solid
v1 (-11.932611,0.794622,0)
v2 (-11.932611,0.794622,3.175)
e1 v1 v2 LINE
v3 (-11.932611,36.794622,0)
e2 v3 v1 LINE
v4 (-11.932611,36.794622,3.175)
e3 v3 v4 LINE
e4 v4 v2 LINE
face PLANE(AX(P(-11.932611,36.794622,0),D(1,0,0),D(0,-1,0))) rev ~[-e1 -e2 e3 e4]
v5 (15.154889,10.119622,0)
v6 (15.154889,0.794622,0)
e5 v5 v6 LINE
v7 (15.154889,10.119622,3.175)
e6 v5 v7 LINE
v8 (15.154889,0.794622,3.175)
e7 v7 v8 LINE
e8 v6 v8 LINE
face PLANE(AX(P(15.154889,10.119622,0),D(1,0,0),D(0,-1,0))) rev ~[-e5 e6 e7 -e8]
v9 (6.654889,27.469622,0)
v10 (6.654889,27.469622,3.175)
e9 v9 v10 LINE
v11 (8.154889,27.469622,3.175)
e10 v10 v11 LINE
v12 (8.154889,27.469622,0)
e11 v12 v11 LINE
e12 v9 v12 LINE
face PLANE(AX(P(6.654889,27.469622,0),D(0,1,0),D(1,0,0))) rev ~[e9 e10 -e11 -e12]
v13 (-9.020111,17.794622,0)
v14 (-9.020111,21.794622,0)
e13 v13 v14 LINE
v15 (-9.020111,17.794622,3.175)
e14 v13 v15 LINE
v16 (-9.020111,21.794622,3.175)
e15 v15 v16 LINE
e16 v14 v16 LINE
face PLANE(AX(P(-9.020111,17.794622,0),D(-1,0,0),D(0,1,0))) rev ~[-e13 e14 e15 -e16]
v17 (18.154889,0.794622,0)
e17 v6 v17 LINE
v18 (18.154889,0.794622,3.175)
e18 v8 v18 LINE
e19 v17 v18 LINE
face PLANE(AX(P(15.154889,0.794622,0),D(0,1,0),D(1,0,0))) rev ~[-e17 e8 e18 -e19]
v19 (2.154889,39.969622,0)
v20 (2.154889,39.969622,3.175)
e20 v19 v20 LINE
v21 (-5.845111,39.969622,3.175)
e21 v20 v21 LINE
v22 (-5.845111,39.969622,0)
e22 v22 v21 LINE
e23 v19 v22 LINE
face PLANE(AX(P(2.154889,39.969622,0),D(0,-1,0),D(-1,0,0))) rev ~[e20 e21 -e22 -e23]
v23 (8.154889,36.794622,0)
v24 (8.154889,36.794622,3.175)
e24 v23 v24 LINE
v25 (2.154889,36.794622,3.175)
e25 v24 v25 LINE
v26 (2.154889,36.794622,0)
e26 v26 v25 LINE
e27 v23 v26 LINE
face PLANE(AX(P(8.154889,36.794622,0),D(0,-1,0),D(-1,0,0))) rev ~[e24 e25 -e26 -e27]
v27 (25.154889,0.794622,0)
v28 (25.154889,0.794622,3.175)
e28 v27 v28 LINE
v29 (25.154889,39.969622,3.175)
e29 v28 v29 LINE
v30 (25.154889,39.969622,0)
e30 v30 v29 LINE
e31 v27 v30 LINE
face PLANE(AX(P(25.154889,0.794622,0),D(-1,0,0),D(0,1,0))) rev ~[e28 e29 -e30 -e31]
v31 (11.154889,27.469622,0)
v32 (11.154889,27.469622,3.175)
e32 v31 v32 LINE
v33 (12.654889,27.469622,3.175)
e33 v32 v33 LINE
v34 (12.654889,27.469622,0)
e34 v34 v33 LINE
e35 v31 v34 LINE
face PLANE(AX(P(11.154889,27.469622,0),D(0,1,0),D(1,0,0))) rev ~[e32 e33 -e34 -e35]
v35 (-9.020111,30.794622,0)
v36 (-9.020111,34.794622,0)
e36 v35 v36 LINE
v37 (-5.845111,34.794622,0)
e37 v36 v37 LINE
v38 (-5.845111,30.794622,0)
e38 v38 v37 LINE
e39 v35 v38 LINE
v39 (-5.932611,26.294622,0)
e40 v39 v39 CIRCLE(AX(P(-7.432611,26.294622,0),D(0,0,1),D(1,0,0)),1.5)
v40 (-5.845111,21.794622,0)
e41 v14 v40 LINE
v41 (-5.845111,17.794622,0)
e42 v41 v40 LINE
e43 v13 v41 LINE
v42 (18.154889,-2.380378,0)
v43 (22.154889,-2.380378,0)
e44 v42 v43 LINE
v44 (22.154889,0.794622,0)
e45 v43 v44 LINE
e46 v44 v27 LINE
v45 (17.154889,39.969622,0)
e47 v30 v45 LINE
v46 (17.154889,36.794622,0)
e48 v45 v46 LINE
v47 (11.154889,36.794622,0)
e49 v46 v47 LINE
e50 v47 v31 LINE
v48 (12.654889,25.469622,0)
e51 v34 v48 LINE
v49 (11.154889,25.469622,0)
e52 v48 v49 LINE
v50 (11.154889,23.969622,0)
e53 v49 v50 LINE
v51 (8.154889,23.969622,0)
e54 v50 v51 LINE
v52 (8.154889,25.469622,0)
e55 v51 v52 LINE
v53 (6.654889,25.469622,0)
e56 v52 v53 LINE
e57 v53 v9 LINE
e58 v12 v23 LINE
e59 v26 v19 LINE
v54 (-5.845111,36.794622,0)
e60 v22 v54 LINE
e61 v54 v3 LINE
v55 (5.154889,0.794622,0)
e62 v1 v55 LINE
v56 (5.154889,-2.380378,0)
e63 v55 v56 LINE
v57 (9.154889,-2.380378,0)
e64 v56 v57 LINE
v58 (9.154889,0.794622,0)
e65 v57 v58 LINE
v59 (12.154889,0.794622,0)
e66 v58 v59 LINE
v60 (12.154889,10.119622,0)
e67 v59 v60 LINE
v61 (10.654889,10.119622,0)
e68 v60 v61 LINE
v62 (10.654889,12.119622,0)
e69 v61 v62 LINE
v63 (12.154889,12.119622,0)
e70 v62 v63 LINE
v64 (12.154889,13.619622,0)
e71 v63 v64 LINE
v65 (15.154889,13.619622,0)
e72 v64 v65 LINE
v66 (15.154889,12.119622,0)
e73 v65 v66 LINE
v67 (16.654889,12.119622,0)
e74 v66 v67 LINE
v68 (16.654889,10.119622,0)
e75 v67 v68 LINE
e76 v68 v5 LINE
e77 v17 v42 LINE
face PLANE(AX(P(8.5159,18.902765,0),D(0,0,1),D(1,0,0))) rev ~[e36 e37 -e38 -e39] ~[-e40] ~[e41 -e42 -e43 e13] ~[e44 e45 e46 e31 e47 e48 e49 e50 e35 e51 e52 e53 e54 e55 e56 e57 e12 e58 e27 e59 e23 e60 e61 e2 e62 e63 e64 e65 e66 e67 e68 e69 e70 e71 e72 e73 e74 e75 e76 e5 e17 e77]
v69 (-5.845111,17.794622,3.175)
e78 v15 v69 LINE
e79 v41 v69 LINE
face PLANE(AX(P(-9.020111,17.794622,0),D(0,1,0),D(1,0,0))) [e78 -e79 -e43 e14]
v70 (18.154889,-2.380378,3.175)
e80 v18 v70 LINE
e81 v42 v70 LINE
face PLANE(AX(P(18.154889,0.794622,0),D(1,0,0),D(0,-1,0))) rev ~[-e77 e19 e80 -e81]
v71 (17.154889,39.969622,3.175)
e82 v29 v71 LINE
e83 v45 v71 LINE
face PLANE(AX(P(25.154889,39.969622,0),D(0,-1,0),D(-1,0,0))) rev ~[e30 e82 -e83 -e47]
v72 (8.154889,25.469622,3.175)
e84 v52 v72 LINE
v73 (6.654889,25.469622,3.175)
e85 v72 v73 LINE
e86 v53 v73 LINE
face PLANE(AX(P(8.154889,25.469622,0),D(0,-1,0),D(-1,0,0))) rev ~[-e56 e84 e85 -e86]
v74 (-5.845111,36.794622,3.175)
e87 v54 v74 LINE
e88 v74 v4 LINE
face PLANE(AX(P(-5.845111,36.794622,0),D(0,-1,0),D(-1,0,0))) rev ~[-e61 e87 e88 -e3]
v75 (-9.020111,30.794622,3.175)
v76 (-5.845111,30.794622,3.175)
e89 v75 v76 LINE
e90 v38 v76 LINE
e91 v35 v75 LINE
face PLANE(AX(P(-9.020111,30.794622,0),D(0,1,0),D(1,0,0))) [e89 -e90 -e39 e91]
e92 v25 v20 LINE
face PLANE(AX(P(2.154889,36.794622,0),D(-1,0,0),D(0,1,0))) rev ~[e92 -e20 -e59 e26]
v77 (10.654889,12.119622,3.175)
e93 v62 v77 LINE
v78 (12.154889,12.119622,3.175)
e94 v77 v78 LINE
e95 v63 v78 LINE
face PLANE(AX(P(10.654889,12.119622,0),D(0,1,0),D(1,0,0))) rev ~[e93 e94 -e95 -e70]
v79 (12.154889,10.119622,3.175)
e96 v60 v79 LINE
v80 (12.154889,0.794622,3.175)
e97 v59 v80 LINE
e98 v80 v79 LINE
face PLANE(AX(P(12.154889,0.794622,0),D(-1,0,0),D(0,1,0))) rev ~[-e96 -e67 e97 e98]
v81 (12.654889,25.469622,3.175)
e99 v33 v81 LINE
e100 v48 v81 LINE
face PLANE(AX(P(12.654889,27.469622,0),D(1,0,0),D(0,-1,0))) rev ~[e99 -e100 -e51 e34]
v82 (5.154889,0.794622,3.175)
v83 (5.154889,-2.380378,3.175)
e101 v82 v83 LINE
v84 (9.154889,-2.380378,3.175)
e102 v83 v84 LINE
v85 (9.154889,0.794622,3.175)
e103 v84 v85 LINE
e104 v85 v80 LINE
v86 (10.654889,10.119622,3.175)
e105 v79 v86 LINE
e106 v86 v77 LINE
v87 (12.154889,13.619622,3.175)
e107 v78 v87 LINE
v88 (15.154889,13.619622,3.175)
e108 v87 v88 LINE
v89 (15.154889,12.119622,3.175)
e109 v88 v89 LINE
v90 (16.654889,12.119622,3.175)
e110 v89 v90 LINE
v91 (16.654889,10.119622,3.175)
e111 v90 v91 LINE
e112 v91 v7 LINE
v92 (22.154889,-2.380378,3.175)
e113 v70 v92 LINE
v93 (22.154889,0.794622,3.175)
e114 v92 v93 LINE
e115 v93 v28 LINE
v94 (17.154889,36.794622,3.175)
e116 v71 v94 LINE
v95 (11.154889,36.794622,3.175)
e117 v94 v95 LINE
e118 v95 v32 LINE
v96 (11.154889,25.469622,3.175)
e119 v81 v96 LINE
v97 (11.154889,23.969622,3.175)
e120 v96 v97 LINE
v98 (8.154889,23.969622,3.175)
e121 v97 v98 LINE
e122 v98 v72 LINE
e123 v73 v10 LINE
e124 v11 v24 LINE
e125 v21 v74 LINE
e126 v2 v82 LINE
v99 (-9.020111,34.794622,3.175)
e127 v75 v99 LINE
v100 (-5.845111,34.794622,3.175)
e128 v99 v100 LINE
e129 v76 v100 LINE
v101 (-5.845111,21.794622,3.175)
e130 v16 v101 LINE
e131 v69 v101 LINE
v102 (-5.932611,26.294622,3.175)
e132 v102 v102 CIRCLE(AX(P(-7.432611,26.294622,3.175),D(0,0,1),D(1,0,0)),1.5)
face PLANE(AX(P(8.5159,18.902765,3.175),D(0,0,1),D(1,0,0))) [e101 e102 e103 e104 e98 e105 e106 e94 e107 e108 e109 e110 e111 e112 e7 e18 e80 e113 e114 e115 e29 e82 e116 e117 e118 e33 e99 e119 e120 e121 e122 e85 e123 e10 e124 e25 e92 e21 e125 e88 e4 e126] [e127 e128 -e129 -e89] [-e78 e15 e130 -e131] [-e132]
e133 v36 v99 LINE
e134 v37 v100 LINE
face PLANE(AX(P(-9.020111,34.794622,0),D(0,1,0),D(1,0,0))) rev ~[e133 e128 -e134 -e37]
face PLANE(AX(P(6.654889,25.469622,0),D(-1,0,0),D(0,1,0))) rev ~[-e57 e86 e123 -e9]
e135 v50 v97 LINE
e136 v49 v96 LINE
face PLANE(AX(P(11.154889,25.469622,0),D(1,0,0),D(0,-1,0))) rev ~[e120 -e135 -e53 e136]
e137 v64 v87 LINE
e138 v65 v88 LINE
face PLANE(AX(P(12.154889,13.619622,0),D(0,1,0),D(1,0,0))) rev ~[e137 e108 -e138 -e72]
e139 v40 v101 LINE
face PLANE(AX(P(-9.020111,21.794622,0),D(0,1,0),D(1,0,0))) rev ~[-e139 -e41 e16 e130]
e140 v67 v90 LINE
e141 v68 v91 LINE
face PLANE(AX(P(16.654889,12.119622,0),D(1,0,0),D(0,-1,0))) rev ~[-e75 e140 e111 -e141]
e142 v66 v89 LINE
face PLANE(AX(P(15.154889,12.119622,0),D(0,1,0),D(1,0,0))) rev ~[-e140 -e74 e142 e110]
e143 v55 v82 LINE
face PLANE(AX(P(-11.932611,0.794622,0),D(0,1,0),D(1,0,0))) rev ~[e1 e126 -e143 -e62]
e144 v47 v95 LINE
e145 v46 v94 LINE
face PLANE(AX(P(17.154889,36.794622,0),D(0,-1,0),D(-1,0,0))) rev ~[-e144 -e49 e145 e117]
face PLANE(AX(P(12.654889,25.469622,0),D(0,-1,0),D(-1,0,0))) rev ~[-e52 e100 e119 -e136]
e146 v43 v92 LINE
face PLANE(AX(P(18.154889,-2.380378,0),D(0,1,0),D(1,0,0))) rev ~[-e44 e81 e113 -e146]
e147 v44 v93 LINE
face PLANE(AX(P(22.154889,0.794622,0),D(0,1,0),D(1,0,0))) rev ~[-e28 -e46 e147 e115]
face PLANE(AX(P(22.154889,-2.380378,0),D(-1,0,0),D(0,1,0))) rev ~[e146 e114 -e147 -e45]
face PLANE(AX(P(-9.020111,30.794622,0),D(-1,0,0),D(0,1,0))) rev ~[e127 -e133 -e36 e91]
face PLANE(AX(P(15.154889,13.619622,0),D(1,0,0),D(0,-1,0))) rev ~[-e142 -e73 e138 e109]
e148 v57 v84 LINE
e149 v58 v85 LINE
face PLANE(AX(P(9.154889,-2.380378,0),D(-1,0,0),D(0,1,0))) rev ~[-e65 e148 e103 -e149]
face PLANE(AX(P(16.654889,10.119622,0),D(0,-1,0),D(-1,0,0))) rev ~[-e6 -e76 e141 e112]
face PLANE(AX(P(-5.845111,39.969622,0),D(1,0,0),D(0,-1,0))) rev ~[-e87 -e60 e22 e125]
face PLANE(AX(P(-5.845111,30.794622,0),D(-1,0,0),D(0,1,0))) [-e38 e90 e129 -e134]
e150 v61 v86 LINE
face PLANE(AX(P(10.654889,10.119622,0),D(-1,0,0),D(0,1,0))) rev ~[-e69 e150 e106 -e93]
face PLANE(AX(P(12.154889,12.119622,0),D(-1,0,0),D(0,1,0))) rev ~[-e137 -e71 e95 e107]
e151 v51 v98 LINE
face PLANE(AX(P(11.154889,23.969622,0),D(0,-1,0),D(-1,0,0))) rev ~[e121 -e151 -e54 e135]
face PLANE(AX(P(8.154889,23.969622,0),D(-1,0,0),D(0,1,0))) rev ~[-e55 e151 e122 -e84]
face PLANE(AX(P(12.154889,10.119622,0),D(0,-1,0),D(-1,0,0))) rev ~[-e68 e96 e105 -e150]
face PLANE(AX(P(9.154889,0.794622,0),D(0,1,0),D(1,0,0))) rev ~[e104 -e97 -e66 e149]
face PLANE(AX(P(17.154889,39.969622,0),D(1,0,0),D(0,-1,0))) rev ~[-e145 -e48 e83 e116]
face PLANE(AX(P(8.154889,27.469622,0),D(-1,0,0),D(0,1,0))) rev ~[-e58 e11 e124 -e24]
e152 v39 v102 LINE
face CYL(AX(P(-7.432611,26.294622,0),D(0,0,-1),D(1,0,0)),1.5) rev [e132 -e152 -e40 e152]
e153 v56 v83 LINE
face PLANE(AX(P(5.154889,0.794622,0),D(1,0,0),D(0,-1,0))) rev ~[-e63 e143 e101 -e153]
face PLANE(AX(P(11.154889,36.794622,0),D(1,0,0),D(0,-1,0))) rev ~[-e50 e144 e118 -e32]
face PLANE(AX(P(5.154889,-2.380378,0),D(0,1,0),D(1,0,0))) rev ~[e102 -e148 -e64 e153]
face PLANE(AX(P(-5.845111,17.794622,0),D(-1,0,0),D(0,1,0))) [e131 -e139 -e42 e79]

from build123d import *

# Parameters (mm, degrees)
F0_W     = 3.175
F0_H     = 4
F0_R     = 1.5
F1_DEPTH = 3.175


# Not quite as in the source:
# - a length typed as a fraction of an inch, garbled in the dataset ("3 / 203.2 mm" for 3/8 in), is restored
# - a feature names something its author has since deleted; it is built from what else it names


with BuildPart() as f1:
    # F0 (on Top) → F1 (new body)
    with BuildSketch(Plane.XY):
        Polygon((11.1548891366, 23.9696219414), (8.1548891366, 23.9696219414), (8.1548891366, 25.4696219414), (6.6548891366, 25.4696219414), (6.6548891366, 27.4696219414), (8.1548891366, 27.4696219414), (8.1548891366, 36.7946219414), (2.1548891366, 36.7946219414), (2.1548891366, 39.9696219414), (-5.8451108634, 39.9696219414), (-5.8451108634, 36.7946219414), (-11.9326108634, 36.7946219414), (-11.9326108634, 0.7946219414), (5.1548891366, 0.7946219414), (5.1548891366, -2.3803780586), (9.1548891366, -2.3803780586), (9.1548891366, 0.7946219414), (12.1548891366, 0.7946219414), (12.1548891366, 10.1196219414), (10.6548891366, 10.1196219414), (10.6548891366, 12.1196219414), (12.1548891366, 12.1196219414), (12.1548891366, 13.6196219414), (15.1548891366, 13.6196219414), (15.1548891366, 12.1196219414), (16.6548891366, 12.1196219414), (16.6548891366, 10.1196219414), (15.1548891366, 10.1196219414), (15.1548891366, 0.7946219414), (18.1548891366, 0.7946219414), (18.1548891366, -2.3803780586), (22.1548891366, -2.3803780586), (22.1548891366, 0.7946219414), (25.1548891366, 0.7946219414), (25.1548891366, 36.7946219414), (25.1548891366, 39.9696219414), (17.1548891366, 39.9696219414), (17.1548891366, 36.7946219414), (11.1548891366, 36.7946219414), (11.1548891366, 27.4696219414), (12.6548891366, 27.4696219414), (12.6548891366, 25.4696219414), (11.1548891366, 25.4696219414), align=None)
        with Locations((-7.4326108634, 19.7946219414)):
            Rectangle(F0_W, F0_H, mode=Mode.SUBTRACT)
        with Locations((-7.4326108634, 26.2946219414)):
            Circle(F0_R, mode=Mode.SUBTRACT)
        with Locations((-7.4326108634, 32.7946219414)):
            Rectangle(F0_W, F0_H, mode=Mode.SUBTRACT)
    extrude(amount=F1_DEPTH)


solid = f1.part
